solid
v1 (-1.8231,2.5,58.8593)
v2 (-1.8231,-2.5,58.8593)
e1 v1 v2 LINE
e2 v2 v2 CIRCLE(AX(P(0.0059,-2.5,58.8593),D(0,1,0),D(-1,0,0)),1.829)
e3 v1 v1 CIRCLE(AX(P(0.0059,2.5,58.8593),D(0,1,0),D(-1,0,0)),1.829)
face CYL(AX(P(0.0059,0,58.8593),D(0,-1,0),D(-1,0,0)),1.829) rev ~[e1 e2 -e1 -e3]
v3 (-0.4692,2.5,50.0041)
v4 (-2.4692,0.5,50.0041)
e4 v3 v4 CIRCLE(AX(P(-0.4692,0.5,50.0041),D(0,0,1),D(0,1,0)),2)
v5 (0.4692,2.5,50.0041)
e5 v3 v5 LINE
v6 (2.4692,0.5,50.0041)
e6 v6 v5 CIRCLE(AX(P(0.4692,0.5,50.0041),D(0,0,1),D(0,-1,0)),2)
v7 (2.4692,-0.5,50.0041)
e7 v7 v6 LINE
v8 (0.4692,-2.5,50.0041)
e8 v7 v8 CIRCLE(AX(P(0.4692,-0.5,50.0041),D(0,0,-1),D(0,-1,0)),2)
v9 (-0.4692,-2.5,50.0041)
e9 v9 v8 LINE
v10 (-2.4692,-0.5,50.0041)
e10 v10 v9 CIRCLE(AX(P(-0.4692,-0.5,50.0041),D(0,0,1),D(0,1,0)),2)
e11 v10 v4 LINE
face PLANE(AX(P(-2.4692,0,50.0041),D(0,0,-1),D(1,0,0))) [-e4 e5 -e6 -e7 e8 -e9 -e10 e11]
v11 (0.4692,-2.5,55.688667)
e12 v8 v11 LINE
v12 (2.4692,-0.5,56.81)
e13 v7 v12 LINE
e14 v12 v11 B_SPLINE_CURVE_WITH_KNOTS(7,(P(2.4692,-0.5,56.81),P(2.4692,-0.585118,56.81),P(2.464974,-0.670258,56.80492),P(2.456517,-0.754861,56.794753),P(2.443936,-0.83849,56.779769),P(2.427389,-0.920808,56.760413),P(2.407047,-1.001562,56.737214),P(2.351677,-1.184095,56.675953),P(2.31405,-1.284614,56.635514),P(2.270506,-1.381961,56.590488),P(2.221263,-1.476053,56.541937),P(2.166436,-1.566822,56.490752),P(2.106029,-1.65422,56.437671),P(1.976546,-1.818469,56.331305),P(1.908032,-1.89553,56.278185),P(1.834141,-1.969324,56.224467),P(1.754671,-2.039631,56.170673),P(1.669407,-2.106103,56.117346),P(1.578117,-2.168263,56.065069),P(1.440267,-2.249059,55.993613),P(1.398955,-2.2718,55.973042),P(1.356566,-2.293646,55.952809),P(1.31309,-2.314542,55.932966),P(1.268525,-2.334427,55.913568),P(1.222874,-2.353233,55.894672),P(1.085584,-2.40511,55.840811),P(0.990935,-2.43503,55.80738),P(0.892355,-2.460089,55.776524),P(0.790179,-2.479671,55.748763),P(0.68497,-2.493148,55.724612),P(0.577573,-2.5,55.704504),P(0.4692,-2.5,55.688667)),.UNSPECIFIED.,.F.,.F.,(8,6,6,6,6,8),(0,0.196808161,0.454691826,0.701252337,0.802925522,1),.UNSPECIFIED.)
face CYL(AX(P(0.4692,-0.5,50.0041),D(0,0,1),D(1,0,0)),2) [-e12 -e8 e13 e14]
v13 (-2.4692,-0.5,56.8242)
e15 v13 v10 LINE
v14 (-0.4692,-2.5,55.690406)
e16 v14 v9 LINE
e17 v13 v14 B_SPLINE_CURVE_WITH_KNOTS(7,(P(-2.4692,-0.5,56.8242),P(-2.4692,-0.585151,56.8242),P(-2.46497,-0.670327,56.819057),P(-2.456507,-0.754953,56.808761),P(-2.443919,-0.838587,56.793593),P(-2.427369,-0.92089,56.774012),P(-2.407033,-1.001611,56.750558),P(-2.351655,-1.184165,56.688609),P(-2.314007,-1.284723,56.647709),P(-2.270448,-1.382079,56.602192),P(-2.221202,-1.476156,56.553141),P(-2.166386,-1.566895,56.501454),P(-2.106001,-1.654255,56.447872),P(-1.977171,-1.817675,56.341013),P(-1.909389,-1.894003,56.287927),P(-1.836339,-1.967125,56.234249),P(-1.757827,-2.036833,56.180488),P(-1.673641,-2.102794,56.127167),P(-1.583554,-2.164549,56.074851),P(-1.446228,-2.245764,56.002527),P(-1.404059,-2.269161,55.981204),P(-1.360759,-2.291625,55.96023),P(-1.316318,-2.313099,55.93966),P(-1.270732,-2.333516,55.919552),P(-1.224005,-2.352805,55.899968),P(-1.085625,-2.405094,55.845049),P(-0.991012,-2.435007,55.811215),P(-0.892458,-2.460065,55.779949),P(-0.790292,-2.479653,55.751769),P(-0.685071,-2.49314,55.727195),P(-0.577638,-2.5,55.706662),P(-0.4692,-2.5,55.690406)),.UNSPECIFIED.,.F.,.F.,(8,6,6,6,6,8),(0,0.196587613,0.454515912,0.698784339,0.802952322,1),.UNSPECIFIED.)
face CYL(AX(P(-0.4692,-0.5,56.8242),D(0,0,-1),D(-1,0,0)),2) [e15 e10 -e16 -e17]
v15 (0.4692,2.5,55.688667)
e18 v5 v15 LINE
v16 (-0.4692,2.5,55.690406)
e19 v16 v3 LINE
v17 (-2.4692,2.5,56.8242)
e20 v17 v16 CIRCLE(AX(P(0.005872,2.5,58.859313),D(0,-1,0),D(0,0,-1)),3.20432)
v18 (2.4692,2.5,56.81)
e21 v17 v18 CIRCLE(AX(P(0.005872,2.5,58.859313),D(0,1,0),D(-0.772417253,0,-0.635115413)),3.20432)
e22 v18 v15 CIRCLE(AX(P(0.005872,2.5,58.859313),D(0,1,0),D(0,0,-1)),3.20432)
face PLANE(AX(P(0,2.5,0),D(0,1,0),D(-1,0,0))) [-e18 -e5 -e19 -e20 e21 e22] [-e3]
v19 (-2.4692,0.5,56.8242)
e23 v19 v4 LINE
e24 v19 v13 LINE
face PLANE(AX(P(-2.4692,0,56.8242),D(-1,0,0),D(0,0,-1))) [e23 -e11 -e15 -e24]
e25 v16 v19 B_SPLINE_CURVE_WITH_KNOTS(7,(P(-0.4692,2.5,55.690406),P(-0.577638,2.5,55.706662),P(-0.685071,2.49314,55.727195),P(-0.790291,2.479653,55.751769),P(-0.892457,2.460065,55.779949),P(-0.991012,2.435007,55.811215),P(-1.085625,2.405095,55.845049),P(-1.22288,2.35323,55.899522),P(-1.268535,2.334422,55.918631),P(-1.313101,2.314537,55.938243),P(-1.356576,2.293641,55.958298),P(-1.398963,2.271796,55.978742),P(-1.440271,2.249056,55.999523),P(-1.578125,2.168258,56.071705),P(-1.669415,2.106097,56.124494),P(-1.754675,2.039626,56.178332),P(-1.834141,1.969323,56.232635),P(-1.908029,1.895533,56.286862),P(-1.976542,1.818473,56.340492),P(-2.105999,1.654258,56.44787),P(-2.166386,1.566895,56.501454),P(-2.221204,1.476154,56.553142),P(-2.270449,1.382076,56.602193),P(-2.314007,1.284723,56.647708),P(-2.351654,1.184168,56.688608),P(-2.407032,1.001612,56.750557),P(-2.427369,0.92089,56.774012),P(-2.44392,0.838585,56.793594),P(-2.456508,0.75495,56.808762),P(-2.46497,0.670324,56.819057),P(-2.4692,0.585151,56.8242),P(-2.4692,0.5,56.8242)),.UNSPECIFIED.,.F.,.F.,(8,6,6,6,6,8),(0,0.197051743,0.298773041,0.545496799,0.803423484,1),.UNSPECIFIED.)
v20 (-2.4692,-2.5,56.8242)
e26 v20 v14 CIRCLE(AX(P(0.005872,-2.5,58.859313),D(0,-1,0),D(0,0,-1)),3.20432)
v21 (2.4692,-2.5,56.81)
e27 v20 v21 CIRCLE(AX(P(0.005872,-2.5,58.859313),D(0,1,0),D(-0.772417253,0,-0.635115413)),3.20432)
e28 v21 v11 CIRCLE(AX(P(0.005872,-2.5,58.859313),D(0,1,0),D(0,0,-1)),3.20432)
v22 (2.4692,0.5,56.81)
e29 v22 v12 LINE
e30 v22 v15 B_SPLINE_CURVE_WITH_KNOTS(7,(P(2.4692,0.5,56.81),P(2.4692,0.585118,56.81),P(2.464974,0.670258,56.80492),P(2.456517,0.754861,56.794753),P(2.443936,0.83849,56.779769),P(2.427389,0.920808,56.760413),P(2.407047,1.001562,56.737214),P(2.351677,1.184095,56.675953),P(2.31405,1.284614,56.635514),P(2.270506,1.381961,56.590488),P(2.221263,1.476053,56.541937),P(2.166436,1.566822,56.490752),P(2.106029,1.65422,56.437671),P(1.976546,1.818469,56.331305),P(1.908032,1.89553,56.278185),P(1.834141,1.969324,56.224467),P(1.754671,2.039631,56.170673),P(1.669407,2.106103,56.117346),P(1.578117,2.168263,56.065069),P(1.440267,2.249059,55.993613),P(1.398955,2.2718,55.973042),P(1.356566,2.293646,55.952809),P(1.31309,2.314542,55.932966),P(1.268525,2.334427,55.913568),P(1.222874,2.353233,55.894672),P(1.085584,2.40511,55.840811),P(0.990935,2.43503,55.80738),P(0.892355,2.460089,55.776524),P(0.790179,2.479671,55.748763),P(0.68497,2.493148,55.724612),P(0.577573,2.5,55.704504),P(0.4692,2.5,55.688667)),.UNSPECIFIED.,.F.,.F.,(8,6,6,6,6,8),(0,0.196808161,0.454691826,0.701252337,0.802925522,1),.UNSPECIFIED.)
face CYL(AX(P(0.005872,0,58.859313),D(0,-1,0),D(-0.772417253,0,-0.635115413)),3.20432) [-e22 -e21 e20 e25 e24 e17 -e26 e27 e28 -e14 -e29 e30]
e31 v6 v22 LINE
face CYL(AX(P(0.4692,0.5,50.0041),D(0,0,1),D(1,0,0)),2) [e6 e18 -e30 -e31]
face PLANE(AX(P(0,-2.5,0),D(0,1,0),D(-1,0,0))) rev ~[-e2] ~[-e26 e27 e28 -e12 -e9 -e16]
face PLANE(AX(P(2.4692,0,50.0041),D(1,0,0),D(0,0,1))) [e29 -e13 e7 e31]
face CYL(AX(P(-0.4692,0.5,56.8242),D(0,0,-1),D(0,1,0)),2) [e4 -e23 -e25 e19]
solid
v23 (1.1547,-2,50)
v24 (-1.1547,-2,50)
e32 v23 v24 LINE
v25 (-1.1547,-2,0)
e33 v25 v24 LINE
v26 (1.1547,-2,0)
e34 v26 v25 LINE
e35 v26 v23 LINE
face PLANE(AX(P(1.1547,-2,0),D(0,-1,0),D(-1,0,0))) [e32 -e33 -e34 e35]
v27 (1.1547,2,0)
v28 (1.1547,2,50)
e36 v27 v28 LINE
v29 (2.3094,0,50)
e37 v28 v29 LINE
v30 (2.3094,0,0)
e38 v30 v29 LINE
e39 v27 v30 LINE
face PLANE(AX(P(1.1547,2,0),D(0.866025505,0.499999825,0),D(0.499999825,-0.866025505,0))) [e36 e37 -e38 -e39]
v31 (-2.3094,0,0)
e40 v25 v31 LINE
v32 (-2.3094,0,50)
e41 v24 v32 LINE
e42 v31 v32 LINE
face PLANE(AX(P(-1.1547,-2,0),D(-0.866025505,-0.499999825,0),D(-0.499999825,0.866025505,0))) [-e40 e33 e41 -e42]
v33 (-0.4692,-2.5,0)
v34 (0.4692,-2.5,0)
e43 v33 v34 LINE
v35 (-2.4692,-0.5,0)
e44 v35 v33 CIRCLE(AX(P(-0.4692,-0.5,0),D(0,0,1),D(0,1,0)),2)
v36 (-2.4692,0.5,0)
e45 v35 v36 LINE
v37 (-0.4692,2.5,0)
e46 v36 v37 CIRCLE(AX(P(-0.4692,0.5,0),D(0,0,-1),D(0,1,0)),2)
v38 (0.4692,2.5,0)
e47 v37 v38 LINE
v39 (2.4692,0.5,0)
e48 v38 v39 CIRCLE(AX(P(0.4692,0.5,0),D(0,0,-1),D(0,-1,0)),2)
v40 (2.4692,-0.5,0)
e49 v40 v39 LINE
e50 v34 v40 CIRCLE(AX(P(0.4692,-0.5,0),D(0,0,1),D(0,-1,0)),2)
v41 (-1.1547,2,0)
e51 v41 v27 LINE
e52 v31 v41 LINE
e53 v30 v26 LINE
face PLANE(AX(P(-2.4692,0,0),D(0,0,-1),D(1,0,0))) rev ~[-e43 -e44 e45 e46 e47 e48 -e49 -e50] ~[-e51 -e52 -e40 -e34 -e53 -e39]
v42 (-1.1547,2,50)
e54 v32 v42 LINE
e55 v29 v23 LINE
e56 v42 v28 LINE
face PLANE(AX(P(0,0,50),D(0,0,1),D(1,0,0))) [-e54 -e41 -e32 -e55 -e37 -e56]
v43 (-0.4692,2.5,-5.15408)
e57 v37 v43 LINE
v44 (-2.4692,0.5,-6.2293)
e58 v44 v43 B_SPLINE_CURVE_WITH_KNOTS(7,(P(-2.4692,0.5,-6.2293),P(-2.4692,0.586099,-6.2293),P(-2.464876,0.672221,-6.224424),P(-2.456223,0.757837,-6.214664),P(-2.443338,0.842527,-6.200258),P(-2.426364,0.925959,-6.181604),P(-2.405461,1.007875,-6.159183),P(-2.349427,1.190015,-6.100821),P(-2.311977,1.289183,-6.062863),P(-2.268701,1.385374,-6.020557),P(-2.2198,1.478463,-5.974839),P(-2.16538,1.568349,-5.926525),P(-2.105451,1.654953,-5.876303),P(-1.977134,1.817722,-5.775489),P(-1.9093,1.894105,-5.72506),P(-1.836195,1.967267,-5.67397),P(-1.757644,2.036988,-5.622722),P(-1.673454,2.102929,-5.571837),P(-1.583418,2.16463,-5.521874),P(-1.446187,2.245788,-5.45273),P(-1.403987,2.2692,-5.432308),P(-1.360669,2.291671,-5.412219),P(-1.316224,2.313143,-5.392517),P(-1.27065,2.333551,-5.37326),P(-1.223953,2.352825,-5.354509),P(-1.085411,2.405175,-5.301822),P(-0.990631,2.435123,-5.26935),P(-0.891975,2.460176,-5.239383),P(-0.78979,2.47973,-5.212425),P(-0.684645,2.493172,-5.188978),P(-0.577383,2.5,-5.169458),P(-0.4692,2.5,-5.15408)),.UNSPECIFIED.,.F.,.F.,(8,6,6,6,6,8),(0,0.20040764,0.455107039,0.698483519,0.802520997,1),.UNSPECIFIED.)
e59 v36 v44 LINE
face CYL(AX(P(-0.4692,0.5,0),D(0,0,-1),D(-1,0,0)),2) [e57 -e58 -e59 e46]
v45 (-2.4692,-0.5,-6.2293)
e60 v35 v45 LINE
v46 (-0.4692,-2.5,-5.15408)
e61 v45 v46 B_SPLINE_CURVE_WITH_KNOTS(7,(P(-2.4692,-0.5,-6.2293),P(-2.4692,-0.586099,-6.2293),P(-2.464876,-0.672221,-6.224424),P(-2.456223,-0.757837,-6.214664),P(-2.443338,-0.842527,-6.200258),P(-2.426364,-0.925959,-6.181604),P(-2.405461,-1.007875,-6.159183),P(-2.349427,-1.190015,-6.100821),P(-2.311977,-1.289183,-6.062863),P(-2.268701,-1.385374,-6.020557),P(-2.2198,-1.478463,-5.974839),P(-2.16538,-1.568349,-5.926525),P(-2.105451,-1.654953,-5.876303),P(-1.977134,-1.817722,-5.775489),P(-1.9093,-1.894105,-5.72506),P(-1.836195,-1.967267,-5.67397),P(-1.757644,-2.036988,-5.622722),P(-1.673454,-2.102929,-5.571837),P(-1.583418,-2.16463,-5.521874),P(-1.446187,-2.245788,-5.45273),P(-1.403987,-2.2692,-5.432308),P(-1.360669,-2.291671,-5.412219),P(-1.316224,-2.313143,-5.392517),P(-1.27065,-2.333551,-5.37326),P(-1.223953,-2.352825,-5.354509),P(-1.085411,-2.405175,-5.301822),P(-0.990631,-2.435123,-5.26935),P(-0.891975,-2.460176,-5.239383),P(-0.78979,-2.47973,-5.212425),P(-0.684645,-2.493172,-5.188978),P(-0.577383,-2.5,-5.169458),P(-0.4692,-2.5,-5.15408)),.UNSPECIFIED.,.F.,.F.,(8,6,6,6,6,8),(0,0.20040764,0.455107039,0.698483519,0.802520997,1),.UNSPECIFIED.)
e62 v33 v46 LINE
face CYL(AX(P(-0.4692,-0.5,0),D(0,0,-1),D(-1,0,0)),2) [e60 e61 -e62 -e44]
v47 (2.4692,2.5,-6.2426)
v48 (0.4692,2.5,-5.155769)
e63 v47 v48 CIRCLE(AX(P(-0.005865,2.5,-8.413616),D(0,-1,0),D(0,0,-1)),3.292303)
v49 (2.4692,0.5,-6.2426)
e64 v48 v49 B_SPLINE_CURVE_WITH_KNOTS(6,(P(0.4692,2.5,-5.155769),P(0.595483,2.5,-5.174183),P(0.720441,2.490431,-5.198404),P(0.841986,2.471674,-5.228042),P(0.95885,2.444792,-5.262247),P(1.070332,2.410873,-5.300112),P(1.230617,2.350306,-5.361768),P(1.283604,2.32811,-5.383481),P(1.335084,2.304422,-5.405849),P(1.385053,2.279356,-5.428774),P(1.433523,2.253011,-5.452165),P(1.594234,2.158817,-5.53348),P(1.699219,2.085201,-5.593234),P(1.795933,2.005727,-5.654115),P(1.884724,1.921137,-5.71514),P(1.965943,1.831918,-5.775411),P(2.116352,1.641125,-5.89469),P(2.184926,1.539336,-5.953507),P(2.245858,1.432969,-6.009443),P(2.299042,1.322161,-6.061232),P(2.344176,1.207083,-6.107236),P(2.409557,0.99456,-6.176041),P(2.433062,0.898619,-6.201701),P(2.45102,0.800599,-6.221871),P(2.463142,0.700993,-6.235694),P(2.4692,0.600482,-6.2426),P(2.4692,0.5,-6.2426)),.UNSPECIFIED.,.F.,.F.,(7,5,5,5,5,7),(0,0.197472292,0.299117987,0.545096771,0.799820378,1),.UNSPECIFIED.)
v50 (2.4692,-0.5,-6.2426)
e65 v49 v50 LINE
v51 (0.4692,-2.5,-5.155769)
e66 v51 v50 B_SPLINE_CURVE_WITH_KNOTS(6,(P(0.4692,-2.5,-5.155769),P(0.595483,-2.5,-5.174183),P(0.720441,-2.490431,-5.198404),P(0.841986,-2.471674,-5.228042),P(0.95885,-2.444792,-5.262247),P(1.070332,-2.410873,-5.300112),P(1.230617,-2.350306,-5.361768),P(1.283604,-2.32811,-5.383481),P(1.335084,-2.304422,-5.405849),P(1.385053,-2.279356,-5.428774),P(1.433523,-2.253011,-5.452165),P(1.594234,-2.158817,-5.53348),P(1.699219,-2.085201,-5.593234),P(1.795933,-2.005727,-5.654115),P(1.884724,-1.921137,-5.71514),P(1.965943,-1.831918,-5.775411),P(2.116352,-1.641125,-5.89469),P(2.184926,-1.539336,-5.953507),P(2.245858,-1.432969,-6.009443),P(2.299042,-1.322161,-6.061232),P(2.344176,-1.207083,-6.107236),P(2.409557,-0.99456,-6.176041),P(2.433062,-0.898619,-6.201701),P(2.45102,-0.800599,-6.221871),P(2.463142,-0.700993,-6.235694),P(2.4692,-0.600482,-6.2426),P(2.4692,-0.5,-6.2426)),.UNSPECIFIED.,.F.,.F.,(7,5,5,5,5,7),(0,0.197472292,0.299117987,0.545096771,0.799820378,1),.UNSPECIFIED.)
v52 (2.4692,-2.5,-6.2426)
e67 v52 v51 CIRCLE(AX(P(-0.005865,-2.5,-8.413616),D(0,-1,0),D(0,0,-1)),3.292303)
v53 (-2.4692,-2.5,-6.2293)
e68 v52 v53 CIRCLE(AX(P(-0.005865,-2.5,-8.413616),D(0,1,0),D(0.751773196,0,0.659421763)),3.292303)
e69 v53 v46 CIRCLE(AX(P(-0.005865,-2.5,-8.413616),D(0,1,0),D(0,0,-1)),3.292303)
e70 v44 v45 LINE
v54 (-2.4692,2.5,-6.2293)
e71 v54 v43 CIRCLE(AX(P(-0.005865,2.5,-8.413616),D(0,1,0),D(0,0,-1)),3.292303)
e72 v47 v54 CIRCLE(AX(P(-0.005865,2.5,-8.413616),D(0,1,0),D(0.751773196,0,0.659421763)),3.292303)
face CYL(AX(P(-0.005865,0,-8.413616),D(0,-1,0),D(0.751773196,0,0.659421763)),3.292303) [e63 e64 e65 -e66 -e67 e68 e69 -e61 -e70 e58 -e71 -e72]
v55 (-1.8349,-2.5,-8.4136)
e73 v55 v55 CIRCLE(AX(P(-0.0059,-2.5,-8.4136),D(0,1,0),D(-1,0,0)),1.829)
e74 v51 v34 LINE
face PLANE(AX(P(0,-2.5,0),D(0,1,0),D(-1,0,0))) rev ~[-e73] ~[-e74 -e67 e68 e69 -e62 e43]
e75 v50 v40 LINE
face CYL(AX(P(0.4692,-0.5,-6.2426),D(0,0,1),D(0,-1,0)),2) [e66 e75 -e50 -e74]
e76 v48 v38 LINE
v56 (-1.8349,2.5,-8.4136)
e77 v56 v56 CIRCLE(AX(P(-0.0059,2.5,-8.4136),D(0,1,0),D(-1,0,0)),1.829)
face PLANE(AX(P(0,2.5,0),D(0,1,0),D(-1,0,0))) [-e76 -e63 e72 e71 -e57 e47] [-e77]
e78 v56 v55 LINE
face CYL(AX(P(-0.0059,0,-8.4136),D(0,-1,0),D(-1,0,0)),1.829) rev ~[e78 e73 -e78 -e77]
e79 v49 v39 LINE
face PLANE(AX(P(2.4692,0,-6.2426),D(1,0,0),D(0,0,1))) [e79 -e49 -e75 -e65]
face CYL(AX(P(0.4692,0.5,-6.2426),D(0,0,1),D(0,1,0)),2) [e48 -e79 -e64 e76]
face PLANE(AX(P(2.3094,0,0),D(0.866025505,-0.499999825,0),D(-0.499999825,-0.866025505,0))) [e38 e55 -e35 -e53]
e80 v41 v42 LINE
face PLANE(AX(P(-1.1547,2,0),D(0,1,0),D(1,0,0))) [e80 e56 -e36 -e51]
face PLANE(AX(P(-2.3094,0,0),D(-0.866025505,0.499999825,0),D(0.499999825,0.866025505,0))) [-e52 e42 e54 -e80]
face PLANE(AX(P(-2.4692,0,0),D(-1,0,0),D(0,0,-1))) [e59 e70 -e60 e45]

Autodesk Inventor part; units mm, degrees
ref_plane "YZ Plane" through (0, 0, 0) normal (1, 0, 0) x (0, 1, 0)
ref_plane "XZ Plane" through (0, 0, 0) normal (0, 1, 0) x (-1, 0, 0)
ref_plane "XY Plane" through (0, 0, 0) normal (0, 0, 1) x (1, 0, 0)
sketch "Sketch1" plane through (0, 0, 0) normal (0, 0, 1) x (1, 0, 0)
  line L0 (2.3094, 0) -> (1.1547, -2)
  line L1 (1.1547, -2) -> (-1.1547, -2)
  line L2 (-1.1547, -2) -> (-2.3094, 0)
  line L3 (-2.3094, 0) -> (-1.1547, 2)
  line L4 (-1.1547, 2) -> (1.1547, 2)
  line L5 (1.1547, 2) -> (2.3094, 0)
  point P0 (0, 0)
  point P1 (0, 0)
  point P2 (0, -2)
  dimension "d0" = 4
extrude "Extrusion1" add sketch "Sketch1" along normal blind 50
sketch "Sketch3" plane through (0, 0, 0) normal (0, 1, 0) x (-1, 0, 0)
  circle A0 centre (0.0059, -8.4136) radius 1.829
  line L0 (2.4692, 0) -> (2.4692, -6.2293)
  line L1 (-2.4692, -6.2426) -> (-2.4692, 0)
  arc A1 (-2.4692, -6.2426) -> (2.4692, -6.2293) centre (0.0059, -8.4136) ccw
  circle A2 centre (-0.0059, 58.8593) radius 1.829
  line L2 (-2.4692, 50.0041) -> (-2.4692, 56.81)
  line L3 (2.4692, 56.8242) -> (2.4692, 50.0041)
  arc A3 (2.4692, 56.8242) -> (-2.4692, 56.81) centre (-0.0059, 58.8593) ccw
  line L4 (1.1547, 50) -> (2.3094, 50) projected
  line L5 (2.4692, 50.0041) -> (-2.4692, 50.0041)
  line L6 (2.4692, 0) -> (-2.4692, 0)
  circle A4 centre (0.0059, -8.4136) radius 1.829
  line L7 (-1.1547, 50) -> (-2.3094, 50) projected
  line L8 (2.3094, 50) -> (-2.3094, 50)
  point P0 (1.1547, 34.4)
  point P1 (2.3094, 34.4)
extrude "Extrusion3" add sketch "Sketch3" along normal mid plane 5 contours L2 A3 L3 L5
extrude "Extrusion4" add sketch "Sketch3" along normal mid plane 5 contours L0 A1 L1 L6
fillet "Fillet1" radius 2 8 edges at (2.4692, 2.5, -3.1213) (-2.4692, 2.5, -3.1146) (2.4692, -2.5, -3.1213) (-2.4692, -2.5, -3.1146) (2.4692, -2.5, 53.407) (2.4692, 2.5, 53.407) (-2.4692, 2.5, 53.4141) (-2.4692, -2.5, 53.4141)
properties part number "PX9200-19"
